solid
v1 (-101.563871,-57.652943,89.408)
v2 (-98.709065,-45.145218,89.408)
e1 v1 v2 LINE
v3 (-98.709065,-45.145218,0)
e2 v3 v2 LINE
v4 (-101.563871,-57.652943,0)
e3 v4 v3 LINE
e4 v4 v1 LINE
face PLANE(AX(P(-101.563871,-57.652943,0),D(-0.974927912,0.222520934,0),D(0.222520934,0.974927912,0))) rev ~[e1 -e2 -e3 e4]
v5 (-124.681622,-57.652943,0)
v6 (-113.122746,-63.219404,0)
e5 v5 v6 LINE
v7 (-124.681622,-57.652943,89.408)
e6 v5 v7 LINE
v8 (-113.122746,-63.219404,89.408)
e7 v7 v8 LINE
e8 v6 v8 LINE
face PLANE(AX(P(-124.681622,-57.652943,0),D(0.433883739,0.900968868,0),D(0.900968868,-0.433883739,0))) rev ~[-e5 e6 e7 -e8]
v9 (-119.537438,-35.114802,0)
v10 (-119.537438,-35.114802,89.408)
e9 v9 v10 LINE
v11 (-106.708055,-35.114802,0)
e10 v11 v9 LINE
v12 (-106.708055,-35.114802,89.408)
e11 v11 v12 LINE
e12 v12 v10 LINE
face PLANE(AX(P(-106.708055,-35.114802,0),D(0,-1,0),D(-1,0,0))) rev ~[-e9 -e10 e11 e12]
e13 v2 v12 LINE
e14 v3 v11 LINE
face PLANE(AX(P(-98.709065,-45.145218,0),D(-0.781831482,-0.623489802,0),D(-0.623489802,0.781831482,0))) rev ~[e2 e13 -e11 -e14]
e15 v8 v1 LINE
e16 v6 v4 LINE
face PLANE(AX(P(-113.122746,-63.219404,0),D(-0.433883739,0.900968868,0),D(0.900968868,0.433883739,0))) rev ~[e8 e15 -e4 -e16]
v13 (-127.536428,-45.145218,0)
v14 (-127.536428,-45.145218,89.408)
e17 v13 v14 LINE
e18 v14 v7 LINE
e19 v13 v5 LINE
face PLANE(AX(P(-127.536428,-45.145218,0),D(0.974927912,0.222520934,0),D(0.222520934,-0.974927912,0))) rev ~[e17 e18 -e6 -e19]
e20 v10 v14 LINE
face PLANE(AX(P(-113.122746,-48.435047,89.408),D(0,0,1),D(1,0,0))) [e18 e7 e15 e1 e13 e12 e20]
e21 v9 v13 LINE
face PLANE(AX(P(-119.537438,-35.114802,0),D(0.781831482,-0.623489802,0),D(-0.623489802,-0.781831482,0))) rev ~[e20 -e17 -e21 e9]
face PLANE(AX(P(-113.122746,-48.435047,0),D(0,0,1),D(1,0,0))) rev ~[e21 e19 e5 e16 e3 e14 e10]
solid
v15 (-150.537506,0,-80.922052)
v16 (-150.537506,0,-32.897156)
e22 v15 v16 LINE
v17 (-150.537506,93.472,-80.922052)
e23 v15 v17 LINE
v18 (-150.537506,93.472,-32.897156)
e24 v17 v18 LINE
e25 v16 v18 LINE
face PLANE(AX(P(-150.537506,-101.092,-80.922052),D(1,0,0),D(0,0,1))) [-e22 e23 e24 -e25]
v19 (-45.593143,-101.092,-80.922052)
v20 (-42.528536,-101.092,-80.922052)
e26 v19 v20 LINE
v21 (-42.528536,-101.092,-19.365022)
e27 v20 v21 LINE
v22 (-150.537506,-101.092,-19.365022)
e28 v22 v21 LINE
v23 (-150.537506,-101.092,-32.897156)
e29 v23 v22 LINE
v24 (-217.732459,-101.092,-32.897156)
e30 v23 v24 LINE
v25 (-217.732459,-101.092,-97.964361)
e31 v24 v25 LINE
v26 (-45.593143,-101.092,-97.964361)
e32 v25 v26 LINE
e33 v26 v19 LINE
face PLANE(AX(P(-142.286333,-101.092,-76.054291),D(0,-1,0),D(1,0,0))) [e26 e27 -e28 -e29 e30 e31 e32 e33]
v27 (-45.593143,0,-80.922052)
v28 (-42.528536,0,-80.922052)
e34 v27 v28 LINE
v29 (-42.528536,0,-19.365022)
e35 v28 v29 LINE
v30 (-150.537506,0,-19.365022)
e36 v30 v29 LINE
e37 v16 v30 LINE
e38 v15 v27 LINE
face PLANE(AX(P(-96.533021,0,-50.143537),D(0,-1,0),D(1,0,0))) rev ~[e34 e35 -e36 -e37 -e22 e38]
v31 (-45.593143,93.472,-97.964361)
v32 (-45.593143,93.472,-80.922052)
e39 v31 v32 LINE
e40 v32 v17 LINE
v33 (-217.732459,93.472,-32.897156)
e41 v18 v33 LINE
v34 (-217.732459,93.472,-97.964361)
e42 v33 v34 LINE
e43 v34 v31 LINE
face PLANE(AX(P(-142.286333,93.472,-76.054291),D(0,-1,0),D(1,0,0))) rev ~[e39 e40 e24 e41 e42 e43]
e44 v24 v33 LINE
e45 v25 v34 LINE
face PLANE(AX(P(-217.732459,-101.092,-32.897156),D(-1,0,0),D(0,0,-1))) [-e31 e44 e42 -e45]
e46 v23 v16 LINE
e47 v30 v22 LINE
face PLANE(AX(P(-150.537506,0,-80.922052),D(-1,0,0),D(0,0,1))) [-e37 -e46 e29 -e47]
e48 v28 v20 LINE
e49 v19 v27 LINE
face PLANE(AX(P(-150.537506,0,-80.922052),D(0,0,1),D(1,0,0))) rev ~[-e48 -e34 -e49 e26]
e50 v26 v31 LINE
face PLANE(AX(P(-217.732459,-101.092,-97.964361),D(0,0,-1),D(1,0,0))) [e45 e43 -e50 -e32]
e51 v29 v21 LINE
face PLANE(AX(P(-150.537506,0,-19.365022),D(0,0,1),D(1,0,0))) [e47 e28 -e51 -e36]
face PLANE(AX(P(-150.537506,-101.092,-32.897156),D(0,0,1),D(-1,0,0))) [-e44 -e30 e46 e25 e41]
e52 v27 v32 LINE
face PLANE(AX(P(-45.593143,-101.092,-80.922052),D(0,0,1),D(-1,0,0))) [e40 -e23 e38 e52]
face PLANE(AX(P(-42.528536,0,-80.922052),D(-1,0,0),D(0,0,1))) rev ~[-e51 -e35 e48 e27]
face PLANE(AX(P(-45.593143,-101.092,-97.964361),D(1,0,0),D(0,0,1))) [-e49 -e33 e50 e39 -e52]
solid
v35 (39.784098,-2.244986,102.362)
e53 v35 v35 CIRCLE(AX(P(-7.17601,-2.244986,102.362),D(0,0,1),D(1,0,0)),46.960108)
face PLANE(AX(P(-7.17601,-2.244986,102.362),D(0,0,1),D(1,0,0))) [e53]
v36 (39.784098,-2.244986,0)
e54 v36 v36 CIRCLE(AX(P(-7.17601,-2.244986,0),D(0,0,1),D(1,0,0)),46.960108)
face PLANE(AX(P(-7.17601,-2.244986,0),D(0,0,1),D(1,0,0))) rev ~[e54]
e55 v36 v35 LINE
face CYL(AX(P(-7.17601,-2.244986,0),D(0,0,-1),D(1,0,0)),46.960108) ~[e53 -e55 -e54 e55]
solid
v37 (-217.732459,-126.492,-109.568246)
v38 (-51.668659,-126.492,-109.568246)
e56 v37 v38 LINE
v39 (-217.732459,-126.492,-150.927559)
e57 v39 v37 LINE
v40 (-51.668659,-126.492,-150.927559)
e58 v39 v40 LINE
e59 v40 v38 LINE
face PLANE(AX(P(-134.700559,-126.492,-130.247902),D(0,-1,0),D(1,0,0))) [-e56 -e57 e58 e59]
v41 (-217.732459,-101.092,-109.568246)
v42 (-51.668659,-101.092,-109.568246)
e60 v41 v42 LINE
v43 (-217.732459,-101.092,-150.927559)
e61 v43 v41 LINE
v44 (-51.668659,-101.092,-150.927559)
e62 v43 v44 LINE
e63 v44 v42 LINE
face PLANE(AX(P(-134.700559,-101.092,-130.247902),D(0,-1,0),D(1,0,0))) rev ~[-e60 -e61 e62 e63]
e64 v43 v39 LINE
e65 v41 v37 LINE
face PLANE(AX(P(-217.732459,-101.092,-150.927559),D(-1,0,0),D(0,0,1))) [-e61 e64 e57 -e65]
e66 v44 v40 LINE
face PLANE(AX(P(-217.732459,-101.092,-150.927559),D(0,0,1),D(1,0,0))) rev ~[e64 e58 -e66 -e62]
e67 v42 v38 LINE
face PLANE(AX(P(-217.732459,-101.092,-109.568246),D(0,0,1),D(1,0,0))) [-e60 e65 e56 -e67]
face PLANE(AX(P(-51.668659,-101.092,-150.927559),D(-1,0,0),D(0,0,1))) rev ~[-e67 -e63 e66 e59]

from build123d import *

# Parameters (mm, degrees)
F0_R      = 46.9601079777
F1_DEPTH  = 102.362
F2_W      = 108.0089695752
F2_H      = 61.5570303053
F3_DEPTH  = 101.092
F5_DEPTH  = 89.408
F10_DEPTH = 194.564
F11_W     = 166.0638004541
F11_H     = 41.3593128324
F12_DEPTH = 25.4


# Not quite as in the source:
# - the program builds the solid bodies; features that only make, move or delete a surface that nothing else refers to are left out


with BuildPart() as f1:
    # F0 (on Top) → F1 (new body)
    with BuildSketch(Plane.XY):
        with Locations((-7.1760101607, -2.244985865)):
            Circle(F0_R)
    extrude(amount=F1_DEPTH)


with BuildPart() as f3:
    # F2 (on Front) → F3 (new body)
    with BuildSketch(Plane.XZ):
        with Locations((-96.5330209583, -50.1435371116)):
            Rectangle(F2_W, F2_H)
    extrude(amount=F3_DEPTH)

    # F9 (on face) → F10 (join)
    with BuildSketch(Plane.XZ.offset(101.092)):
        Polygon((-150.5375057459, -32.8971557319), (-217.7324593067, -32.8971557319), (-217.7324593067, -97.96436131), (-45.5931425095, -97.96436131), (-45.5931425095, -80.9220522642), (-150.5375057459, -80.9220522642), align=None)
    extrude(amount=-F10_DEPTH)


with BuildPart() as f5:
    # F4 (on Top) → F5 (new body)
    with BuildSketch(Plane.XY):
        Polygon((-106.7080545129, -35.1148024201), (-119.5374381838, -35.1148024201), (-127.5364280668, -45.1452184747), (-124.6816216302, -57.6529427116), (-113.1227463484, -63.2194036693), (-101.5638710665, -57.6529427116), (-98.70906463, -45.1452184747), align=None)
    extrude(amount=F5_DEPTH)


with BuildPart() as f12:
    # F11 (on face) → F12 (new body)
    with BuildSketch(Plane.XZ.offset(101.092)):
        with Locations((-134.7005590796, -130.2479021251)):
            Rectangle(F11_W, F11_H)
    extrude(amount=F12_DEPTH)


solid = Compound([f1.part, f3.part, f5.part, f12.part])
